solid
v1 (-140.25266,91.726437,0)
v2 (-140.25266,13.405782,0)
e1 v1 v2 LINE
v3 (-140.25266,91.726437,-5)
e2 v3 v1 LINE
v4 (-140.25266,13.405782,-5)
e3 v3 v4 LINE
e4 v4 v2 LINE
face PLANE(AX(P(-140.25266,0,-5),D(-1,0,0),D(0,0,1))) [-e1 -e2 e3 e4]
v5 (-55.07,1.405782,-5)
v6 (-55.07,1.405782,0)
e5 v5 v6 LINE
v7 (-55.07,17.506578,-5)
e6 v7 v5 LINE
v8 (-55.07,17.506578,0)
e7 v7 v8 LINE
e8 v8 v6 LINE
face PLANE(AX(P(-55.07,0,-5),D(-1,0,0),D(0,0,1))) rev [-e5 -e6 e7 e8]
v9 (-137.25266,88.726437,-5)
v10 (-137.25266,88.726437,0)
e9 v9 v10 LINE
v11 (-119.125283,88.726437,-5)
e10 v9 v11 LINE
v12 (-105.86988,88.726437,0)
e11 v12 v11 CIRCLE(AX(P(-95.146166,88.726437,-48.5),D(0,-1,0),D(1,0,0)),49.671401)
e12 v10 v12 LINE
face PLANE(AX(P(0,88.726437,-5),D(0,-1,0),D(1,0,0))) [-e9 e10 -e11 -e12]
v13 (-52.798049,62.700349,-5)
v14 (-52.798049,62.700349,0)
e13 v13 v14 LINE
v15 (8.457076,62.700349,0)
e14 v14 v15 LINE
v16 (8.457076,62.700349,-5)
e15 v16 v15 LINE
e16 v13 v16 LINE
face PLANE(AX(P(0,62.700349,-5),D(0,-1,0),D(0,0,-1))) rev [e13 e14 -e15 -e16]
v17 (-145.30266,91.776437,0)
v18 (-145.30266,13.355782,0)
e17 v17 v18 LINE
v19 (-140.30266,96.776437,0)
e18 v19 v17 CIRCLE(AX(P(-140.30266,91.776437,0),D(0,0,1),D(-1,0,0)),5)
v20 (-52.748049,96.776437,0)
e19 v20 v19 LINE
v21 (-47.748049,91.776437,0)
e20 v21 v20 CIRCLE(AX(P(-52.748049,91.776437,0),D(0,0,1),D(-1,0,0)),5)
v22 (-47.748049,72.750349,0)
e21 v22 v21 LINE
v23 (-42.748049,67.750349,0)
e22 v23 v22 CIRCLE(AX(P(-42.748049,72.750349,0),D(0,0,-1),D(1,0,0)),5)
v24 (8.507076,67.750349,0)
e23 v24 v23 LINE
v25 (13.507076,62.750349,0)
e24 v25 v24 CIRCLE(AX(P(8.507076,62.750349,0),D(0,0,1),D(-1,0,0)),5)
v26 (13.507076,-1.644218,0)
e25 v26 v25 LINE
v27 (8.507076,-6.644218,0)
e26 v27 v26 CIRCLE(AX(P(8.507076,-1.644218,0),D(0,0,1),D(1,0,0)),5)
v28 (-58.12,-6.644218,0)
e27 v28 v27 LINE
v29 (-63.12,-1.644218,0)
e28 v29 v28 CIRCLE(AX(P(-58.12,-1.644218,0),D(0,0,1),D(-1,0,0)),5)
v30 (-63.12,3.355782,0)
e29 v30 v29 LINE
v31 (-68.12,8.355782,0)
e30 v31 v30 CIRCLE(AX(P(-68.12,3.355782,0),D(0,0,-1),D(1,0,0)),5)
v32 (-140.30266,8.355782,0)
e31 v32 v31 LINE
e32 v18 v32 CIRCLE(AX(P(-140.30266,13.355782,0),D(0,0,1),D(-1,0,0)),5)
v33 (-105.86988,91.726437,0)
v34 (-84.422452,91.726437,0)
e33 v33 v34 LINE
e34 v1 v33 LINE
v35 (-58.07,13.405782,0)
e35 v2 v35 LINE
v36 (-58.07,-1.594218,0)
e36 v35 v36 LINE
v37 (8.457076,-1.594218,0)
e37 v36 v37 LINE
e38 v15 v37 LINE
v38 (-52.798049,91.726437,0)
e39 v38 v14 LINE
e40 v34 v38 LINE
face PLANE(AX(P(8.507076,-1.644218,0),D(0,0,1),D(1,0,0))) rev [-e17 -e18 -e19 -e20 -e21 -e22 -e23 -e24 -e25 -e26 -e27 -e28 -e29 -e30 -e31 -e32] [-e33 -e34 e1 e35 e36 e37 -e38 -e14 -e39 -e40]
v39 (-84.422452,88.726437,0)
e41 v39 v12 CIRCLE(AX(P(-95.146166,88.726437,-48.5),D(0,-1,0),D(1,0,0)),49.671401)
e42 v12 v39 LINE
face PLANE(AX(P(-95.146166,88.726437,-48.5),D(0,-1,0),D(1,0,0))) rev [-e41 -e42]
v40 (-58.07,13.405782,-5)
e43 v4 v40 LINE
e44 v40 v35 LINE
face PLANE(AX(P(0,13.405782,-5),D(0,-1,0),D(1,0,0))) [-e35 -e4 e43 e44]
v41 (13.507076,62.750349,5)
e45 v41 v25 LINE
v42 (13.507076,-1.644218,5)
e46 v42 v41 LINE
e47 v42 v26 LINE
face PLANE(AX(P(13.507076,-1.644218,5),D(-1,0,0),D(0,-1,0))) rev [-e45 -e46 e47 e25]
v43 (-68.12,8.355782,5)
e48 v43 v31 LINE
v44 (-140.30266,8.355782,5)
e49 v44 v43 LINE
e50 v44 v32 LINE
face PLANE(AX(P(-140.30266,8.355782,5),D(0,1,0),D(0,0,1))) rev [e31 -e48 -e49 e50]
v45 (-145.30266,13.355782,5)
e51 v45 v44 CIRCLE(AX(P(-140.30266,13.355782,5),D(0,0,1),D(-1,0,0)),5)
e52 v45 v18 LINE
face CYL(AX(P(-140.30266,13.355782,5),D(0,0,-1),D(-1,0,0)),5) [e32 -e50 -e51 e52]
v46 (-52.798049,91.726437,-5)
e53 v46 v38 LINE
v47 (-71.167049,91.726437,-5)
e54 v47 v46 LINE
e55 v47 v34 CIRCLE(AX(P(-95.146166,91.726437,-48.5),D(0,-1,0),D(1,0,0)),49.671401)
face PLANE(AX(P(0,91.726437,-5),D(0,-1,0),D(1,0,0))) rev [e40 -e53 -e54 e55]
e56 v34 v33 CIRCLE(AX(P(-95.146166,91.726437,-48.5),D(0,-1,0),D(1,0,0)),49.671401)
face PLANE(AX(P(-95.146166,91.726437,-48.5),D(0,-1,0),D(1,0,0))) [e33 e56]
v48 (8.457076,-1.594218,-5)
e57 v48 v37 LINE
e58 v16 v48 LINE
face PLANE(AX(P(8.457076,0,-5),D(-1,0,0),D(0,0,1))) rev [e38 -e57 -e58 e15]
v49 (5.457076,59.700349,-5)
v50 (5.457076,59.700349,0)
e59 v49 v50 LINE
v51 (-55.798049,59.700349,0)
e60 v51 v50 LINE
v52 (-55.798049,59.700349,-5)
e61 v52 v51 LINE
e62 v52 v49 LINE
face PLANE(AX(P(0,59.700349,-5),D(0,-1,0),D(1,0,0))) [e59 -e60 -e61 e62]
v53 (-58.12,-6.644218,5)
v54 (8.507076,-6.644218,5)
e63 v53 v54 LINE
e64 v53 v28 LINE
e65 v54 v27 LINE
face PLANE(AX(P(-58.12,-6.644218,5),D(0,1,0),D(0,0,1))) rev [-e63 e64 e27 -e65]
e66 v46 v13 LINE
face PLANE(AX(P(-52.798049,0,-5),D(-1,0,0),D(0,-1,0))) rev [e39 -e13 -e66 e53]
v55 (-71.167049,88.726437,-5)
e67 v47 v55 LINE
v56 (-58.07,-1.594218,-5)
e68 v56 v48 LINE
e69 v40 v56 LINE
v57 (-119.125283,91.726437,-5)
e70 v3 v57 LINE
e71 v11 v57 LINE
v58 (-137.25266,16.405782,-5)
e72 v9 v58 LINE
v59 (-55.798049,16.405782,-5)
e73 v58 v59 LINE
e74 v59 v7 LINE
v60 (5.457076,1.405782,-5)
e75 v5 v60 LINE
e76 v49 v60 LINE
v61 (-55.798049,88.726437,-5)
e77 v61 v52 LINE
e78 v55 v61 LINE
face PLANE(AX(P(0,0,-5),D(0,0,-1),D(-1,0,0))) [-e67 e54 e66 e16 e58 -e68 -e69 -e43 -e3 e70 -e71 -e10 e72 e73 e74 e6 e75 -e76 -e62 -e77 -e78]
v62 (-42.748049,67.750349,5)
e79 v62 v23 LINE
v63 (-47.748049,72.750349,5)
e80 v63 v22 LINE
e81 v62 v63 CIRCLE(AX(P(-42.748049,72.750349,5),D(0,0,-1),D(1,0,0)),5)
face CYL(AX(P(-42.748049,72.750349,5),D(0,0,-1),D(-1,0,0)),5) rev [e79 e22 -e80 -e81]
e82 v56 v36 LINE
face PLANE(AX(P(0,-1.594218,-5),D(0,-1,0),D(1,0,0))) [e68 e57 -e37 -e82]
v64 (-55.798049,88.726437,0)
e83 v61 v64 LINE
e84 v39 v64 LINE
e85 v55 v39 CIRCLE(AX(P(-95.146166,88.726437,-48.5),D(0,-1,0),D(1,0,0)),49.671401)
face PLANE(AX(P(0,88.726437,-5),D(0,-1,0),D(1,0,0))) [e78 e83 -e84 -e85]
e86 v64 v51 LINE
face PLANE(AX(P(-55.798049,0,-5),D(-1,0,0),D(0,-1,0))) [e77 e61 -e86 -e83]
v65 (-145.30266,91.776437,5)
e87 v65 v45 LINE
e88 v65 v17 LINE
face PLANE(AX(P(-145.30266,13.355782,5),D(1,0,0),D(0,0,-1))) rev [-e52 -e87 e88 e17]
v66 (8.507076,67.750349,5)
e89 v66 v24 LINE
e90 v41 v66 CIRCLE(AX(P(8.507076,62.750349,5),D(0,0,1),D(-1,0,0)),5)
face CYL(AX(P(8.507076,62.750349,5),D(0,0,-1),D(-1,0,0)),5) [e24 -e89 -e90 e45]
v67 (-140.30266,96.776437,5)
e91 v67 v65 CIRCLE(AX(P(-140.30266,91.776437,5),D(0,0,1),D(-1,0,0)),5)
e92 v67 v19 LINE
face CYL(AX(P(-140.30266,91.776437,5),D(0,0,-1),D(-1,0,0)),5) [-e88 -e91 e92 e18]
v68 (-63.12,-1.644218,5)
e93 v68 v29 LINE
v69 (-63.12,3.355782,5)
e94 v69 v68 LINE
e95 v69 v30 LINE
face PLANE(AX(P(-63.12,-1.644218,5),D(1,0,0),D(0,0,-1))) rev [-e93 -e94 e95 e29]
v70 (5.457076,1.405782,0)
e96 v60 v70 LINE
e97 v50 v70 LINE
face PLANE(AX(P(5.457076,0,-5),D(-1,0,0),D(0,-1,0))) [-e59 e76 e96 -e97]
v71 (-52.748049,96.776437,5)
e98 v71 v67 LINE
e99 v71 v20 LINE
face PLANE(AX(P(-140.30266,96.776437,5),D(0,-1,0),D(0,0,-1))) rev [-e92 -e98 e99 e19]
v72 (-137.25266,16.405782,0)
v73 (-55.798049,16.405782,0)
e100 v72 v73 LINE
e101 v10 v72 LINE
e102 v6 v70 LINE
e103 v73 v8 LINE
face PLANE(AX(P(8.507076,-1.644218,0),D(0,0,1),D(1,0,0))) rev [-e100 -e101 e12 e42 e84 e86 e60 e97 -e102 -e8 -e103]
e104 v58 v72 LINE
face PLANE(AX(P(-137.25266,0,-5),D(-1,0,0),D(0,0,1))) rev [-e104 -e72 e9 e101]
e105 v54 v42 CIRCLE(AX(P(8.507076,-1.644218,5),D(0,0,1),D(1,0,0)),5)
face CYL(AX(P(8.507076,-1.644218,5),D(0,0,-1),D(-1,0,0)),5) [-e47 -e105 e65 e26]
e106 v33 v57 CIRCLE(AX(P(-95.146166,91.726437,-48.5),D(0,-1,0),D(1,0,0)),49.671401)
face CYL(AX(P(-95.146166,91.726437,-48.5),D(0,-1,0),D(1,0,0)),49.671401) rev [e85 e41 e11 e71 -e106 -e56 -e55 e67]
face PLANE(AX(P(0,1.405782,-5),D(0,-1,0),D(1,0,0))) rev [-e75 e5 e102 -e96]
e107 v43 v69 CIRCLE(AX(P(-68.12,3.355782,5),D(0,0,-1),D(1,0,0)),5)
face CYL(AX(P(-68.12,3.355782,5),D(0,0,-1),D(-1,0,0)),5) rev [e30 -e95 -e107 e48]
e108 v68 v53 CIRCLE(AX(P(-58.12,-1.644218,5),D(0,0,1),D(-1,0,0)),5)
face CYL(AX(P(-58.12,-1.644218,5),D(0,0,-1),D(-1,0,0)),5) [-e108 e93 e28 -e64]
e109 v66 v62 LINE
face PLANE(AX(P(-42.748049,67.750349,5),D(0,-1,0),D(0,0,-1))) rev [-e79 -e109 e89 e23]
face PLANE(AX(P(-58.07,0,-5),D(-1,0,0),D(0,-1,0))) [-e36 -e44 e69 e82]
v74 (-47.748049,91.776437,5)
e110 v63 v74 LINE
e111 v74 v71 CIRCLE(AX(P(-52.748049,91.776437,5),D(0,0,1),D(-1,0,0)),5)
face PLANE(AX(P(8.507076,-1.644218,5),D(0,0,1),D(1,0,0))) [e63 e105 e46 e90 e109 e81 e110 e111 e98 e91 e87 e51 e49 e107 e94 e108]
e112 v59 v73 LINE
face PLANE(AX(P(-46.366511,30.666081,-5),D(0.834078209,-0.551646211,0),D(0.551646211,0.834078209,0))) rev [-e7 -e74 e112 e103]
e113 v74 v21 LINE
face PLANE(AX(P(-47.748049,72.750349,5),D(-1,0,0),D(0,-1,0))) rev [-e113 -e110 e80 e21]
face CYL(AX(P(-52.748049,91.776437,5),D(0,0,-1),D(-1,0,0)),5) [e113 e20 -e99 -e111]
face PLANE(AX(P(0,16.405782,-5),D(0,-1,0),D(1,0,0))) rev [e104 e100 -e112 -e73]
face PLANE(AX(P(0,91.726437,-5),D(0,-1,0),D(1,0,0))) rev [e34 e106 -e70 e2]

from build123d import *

# Parameters (mm, degrees)
BOSS_EXTRUDE1_DEPTH = 5
BOSS_EXTRUDE2_DEPTH = 5
SKETCH3_R           = 49.671400597
CUT_EXTRUDE1_DEPTH  = 3


# Read off the part's stored shape, not the designer's step: Boss-Extrude2
with BuildPart() as part:
    # Sketch1 → Boss-Extrude1 (new body)
    with BuildSketch(Plane.XY):
        with BuildLine():
            Line((-140.302659687, 8.355782272), (-68.12, 8.355782272))
            ThreePointArc((-68.12, 8.355782272), (-64.584466094, 6.891316178), (-63.12, 3.355782272))
            Line((-63.12, 3.355782272), (-63.12, -1.644217728))
            ThreePointArc((-63.12, -1.644217728), (-61.655533906, -5.179751634), (-58.12, -6.644217728))
            Line((-58.12, -6.644217728), (8.507075949, -6.644217728))
            ThreePointArc((8.507075949, -6.644217728), (12.042609855, -5.179751634), (13.507075949, -1.644217728))
            Line((13.507075949, -1.644217728), (13.507075949, 62.750348787))
            ThreePointArc((13.507075949, 62.750348787), (12.042609855, 66.285882693), (8.507075949, 67.750348787))
            Line((8.507075949, 67.750348787), (-42.74804895, 67.750348787))
            ThreePointArc((-42.74804895, 67.750348787), (-46.283582856, 69.214814881), (-47.74804895, 72.750348787))
            Line((-47.74804895, 72.750348787), (-47.74804895, 91.776437317))
            ThreePointArc((-47.74804895, 91.776437317), (-49.212515044, 95.311971223), (-52.74804895, 96.776437317))
            Line((-52.74804895, 96.776437317), (-140.302659687, 96.776437317))
            ThreePointArc((-140.302659687, 96.776437317), (-143.838193593, 95.311971223), (-145.302659687, 91.776437317))
            Line((-145.302659687, 91.776437317), (-145.302659687, 13.355782272))
            ThreePointArc((-145.302659687, 13.355782272), (-143.838193593, 9.820248366), (-140.302659687, 8.355782272))
        make_face()
    extrude(amount=BOSS_EXTRUDE1_DEPTH)

    # Boss-Extrude2 outline → Boss-Extrude2 (add)
    with BuildSketch(Plane(origin=(0, 0, 0), x_dir=(-1, 0, 0), z_dir=(0, 0, -1))):
        Polygon((52.79804895, 91.726437317), (52.79804895, 62.700348787), (-8.457075949, 62.700348787), (-8.457075949, -1.594217728), (58.07, -1.594217728), (58.07, 13.405782272), (140.252659687, 13.405782272), (140.252659687, 91.726437317), align=None)
        Polygon((137.252659687, 16.405782272), (55.79804895, 16.405782272), (55.07, 17.506577949), (55.07, 1.405782272), (-5.457075949, 1.405782272), (-5.457075949, 59.700348787), (55.79804895, 59.700348787), (55.79804895, 88.726437317), (137.252659687, 88.726437317), align=None, mode=Mode.SUBTRACT)
    extrude(amount=BOSS_EXTRUDE2_DEPTH)

    # Sketch3 → Cut-Extrude1 (cut)
    with BuildSketch(Plane.XZ.offset(-88.726437317)):
        with Locations((-95.146165884, -48.5)):
            Circle(SKETCH3_R)
    extrude(amount=-CUT_EXTRUDE1_DEPTH, mode=Mode.SUBTRACT)


solid = part.part
